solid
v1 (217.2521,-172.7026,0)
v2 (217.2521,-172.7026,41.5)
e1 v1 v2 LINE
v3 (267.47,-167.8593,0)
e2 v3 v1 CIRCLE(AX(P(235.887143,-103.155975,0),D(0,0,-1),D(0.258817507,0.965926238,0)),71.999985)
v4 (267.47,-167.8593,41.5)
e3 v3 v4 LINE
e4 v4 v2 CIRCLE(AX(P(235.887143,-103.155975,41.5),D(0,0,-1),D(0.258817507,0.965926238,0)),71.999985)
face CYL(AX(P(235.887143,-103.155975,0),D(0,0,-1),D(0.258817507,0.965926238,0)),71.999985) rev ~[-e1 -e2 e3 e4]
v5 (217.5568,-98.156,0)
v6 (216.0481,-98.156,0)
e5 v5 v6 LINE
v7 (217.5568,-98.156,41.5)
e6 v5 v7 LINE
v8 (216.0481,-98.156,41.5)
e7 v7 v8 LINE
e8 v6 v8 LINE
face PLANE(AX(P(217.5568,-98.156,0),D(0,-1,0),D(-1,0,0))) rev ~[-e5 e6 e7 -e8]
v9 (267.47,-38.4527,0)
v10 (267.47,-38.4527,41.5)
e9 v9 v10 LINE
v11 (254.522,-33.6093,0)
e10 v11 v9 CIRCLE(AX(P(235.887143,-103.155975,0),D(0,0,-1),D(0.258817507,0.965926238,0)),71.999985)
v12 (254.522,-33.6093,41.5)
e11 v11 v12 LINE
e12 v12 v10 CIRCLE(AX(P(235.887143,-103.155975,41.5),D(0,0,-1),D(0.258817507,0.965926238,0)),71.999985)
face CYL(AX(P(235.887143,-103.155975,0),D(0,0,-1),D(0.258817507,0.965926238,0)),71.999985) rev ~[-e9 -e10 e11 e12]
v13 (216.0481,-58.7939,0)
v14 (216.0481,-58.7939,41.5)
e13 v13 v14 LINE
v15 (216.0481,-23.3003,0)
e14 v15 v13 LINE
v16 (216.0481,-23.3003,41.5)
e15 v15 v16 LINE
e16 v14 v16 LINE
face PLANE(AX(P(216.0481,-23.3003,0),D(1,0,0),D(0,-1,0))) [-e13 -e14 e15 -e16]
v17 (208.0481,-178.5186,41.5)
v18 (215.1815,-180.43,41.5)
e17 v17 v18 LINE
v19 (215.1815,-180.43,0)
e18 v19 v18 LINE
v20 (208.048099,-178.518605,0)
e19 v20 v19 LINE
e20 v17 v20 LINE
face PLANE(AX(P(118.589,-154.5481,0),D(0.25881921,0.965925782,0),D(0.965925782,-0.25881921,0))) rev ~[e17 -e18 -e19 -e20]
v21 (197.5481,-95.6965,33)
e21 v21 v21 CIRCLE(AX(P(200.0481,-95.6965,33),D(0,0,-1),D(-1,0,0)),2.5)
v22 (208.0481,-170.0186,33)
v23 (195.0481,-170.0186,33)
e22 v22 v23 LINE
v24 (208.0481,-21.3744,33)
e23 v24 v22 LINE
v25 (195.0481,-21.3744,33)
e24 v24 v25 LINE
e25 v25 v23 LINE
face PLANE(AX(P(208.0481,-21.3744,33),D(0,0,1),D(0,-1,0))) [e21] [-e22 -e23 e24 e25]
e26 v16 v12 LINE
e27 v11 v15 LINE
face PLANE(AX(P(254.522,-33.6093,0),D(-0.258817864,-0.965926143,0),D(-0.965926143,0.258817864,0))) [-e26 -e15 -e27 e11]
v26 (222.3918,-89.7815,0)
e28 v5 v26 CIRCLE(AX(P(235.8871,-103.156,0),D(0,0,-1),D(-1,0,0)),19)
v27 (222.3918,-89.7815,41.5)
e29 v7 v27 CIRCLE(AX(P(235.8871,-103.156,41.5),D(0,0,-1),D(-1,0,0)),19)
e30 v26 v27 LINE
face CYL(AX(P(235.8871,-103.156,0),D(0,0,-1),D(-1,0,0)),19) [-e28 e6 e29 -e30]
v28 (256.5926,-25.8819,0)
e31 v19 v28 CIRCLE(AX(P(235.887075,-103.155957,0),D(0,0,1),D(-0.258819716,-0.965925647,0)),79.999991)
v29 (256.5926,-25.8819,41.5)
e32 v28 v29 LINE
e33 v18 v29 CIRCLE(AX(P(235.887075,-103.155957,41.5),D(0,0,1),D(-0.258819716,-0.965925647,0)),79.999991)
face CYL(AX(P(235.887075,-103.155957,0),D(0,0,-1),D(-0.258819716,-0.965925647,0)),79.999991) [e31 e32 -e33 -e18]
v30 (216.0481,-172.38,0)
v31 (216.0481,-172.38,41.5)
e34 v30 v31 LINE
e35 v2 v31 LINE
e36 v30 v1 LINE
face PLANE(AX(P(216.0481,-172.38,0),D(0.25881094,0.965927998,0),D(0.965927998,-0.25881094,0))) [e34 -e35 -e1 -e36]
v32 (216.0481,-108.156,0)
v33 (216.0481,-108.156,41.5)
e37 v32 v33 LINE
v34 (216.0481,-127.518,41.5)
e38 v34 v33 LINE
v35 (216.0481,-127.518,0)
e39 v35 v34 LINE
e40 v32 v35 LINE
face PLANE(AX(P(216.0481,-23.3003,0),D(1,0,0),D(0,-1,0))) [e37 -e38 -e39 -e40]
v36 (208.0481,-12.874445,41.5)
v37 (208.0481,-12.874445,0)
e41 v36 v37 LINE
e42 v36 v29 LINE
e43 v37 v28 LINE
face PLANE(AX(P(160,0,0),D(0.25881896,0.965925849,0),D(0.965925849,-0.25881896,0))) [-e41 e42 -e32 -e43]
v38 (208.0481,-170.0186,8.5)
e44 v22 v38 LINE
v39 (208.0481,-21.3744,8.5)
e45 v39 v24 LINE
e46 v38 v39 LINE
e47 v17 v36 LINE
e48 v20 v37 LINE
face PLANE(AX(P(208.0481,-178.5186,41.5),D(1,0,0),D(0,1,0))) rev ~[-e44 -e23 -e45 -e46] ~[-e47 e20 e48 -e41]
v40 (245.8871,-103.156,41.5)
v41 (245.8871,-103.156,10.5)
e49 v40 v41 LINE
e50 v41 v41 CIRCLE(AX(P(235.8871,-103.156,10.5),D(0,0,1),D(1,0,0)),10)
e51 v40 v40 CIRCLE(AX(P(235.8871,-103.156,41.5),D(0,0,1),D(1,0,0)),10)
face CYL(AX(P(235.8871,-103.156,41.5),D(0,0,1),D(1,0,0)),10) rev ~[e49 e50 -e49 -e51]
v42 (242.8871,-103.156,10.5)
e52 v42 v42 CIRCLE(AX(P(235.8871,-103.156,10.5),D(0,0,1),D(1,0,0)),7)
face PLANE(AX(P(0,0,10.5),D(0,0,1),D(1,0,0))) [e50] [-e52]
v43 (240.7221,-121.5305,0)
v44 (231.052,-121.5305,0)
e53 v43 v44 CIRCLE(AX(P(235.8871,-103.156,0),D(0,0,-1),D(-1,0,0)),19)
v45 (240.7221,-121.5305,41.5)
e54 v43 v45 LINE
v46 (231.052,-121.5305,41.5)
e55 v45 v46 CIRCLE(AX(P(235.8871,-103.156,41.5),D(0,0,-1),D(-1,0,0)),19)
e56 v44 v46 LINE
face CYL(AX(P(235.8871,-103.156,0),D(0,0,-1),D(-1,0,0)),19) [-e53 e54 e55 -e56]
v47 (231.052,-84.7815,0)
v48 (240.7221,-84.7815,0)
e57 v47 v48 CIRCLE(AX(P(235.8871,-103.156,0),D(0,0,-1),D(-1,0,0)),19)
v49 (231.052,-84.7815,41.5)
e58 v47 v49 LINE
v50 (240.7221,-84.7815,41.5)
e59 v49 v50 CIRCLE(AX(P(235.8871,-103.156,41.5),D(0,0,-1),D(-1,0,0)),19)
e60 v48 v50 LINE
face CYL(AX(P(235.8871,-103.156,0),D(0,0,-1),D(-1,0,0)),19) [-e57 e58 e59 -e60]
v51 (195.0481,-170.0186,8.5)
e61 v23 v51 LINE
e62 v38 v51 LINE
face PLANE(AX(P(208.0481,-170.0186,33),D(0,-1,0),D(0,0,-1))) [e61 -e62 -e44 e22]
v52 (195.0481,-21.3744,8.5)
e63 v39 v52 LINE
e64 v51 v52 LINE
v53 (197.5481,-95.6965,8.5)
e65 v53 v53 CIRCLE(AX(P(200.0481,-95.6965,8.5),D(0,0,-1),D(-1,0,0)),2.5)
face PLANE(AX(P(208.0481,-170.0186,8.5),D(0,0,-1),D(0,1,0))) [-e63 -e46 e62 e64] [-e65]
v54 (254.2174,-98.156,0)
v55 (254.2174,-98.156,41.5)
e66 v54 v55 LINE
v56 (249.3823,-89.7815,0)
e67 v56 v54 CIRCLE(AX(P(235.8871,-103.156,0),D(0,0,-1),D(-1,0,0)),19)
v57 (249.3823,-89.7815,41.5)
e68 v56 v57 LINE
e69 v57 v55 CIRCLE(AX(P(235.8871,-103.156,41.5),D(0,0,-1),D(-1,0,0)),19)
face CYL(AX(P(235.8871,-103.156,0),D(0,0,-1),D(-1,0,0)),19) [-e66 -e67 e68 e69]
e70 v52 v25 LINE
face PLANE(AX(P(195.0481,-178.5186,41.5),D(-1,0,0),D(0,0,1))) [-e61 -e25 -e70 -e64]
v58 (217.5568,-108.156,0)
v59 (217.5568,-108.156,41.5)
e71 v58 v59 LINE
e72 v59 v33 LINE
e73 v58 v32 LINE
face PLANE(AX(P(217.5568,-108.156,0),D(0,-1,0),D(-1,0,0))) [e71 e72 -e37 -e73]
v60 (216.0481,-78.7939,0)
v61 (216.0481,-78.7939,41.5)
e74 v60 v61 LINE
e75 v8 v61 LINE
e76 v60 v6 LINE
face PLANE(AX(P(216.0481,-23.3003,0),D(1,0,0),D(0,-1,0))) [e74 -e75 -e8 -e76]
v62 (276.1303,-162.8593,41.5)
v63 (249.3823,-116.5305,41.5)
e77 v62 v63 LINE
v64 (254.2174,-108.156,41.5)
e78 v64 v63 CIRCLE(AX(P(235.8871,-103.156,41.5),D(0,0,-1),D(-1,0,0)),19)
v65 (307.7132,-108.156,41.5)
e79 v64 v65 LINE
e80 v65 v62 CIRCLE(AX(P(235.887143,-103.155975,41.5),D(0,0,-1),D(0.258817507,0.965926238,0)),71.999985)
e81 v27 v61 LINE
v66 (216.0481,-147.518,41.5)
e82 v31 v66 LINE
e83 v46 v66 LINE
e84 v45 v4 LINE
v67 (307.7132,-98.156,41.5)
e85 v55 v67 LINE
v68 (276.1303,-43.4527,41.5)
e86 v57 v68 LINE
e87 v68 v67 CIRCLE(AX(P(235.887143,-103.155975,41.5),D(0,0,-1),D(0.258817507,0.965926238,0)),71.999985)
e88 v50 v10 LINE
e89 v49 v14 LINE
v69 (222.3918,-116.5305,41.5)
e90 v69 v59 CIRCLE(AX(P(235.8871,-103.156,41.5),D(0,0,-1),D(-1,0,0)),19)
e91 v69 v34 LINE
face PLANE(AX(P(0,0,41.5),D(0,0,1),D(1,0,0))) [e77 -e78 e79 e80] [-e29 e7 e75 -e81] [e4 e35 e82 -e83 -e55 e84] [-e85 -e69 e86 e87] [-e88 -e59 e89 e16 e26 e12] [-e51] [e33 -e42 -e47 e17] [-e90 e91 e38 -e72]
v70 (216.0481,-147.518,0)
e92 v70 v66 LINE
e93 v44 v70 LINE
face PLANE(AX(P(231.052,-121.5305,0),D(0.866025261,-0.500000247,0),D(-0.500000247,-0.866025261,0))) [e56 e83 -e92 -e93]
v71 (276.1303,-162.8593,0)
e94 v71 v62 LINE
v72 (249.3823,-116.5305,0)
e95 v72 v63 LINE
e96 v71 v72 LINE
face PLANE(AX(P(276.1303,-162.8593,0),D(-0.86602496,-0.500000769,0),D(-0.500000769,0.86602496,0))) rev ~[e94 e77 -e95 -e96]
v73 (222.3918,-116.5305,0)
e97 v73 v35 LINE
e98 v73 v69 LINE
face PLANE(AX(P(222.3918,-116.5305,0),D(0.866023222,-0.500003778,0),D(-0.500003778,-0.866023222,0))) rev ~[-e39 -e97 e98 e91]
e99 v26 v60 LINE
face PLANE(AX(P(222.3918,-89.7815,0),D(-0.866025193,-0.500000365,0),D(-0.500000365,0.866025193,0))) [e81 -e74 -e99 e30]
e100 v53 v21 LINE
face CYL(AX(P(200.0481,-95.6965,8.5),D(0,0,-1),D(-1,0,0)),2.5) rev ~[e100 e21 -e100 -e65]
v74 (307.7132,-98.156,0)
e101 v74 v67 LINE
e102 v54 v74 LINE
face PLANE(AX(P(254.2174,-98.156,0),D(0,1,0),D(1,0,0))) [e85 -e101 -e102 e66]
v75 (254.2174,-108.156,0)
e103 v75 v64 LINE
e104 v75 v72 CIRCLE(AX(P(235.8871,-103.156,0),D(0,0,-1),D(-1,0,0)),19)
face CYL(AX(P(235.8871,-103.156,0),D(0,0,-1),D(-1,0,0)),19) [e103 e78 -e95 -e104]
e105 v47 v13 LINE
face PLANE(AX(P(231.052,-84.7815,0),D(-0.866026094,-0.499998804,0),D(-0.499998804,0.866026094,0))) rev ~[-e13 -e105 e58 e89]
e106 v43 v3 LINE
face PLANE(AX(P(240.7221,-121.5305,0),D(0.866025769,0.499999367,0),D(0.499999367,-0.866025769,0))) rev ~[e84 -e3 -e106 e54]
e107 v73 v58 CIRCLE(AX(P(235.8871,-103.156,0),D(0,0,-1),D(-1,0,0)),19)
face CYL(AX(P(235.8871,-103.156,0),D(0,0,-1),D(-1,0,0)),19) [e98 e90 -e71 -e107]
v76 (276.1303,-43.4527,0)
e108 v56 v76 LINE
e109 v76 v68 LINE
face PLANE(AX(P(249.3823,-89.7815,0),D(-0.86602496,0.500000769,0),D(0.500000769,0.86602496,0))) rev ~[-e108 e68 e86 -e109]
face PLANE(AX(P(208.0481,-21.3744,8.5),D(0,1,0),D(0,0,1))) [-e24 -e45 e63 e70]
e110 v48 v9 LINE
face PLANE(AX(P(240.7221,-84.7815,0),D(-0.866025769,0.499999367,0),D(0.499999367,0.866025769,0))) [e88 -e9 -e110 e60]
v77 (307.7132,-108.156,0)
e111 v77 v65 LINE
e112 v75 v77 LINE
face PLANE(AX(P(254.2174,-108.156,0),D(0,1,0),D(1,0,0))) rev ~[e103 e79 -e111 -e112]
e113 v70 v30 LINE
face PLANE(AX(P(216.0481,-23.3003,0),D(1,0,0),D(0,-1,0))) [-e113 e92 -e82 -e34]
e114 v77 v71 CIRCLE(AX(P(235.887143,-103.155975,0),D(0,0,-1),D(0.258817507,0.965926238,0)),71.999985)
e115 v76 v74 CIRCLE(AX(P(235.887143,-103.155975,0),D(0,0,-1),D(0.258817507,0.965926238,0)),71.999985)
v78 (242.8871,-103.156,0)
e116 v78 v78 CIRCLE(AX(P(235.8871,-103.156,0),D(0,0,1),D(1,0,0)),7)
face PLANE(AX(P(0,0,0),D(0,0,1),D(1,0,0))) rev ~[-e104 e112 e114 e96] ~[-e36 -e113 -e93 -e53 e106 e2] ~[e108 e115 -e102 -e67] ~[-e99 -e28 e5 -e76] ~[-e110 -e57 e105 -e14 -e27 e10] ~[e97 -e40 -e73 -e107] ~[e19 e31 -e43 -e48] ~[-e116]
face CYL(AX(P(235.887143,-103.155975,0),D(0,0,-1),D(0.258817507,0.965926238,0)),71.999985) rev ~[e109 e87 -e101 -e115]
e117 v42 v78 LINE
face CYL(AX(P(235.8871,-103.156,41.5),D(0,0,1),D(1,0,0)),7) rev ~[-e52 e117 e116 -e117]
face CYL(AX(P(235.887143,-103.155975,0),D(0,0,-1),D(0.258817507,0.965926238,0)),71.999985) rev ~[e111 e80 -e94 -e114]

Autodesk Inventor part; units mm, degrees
ref_plane "YZ Plane" through (0, 0, 0) normal (1, 0, 0) x (0, 1, 0)
ref_plane "XZ Plane" through (0, 0, 0) normal (0, 1, 0) x (-1, 0, 0)
ref_plane "XY Plane" through (0, 0, 0) normal (0, 0, 1) x (1, 0, 0)
sketch "Sketch1" plane through (0, 0, 0) normal (0, 0, 1) x (1, 0, 0)
  line L0 (0, 0) -> (160, 0)
  line L1 (160, 0) -> (118.589, -154.5481) construction
  line L2 (0, 0) -> (41.411, -154.5481) construction
  line L3 (41.411, -154.5481) -> (118.589, -154.5481)
  circle A0 centre (235.8871, -103.156) radius 80 construction
  line L4 (160, 0) -> (256.5926, -25.8819)
  line L5 (118.589, -154.5481) -> (215.1815, -180.43)
  arc A1 (215.1815, -180.43) -> (256.5926, -25.8819) centre (235.8871, -103.156) ccw
  circle A2 centre (-75.8871, -103.156) radius 80 construction
  line L6 (0, 0) -> (-96.5926, -25.8819)
  line L7 (41.411, -154.5481) -> (-55.1815, -180.43)
  arc A3 (-96.5926, -25.8819) -> (-55.1815, -180.43) centre (-75.8871, -103.156) ccw
  dimension "d0" = 160
  dimension "d1" = 160
  dimension "d2" = 160
  dimension "d3" = 75
  dimension "d4" = 75
  dimension "d5" = 160
  dimension "d6" = 100
  dimension "d7" = 160
  dimension "d9" = 100
extrude "Extrusion1" add sketch "Sketch1" along normal blind 41.5
sketch "Sketch2" plane through (0, 0, 41.5) normal (0, 0, 1) x (1, 0, 0)
  line L0 (-26.5, -133) -> (186.5, -133)
  line L1 (186.5, -133) -> (186.5, -20)
  line L2 (186.5, -20) -> (-26.5, -20)
  line L3 (-26.5, -20) -> (-26.5, -133)
  line L4 (160, 0) -> (0, 0) projected
  point P0 (80, -20)
  point P1 (80, 0)
  dimension "d12" = 213
  dimension "d13" = 113
  dimension "d14" = 20
extrude "Extrusion2" cut sketch "Sketch2" against normal through all
sketch "Sketch3" plane through (0, 0, 41.5) normal (0, 0, 1) x (1, 0, 0)
  line L0 (-26.5, -133) -> (-26.5, -20) construction
  line L1 (-26.5, -20) -> (186.5, -20) construction
  line L2 (186.5, -20) -> (186.5, -133) construction
  line L3 (186.5, -133) -> (-26.5, -133) construction
  line L4 (-48.0481, 1.5481) -> (-48.0481, -154.5481) construction
  line L5 (-48.0481, -154.5481) -> (208.0481, -154.5481) construction
  line L6 (208.0481, -154.5481) -> (208.0481, 1.5481) construction
  line L7 (208.0481, 1.5481) -> (-48.0481, 1.5481) construction
  line L8 (41.411, -154.5481) -> (118.589, -154.5481) construction
  line L9 (-48.0481, 1.5481) -> (-48.0481, -178.5186) construction
  line L10 (-55.1815, -180.43) -> (41.411, -154.5481) construction
  line L11 (208.0481, 1.5481) -> (208.0481, -178.5186) construction
  line L12 (118.589, -154.5481) -> (215.1815, -180.43) construction
  line L13 (-48.0481, -178.5186) -> (208.0481, -178.5186) construction
  line L14 (-48.0481, 1.5481) -> (208.0481, 1.5481) construction
  line L15 (160, 0) -> (256.5926, -25.8819) construction
  line L16 (208.2963, -12.941) -> (208.0481, -178.5186)
  line L17 (208.2963, -12.941) -> (256.5926, -25.8819)
  line L18 (208.0481, -178.5186) -> (215.1815, -180.43)
  arc A0 (215.1815, -180.43) -> (256.5926, -25.8819) centre (235.8871, -103.156) ccw
  line L19 (208.0481, 1.5481) -> (-166.9519, 1.5481)
  line L20 (-166.9519, 1.5481) -> (-166.9519, -188.4519)
  line L21 (-166.9519, -188.4519) -> (208.0481, -188.4519)
  line L22 (208.0481, -188.4519) -> (208.0481, 1.5481)
  point P0 (0, 0)
  point P1 (80, -154.5481)
  dimension "d17" = 190
  dimension "d18" = 375
extrude "Extrusion3" cut sketch "Sketch3" against normal through all contours L22 L21 L20 L19
sketch "Sketch4" plane through (0, 0, 41.5) normal (0, 0, 1) x (1, 0, 0)
  arc A0 (215.1815, -180.43) -> (256.5926, -25.8819) centre (235.8871, -103.156) ccw projected
  circle A1 centre (235.8871, -103.156) radius 7
  point P0 (0, 0)
  dimension "d21" = 14
extrude "Extrusion4" cut sketch "Sketch4" against normal through all
sketch "Sketch5" plane through (208.0481, -178.5186, 41.5) normal (-1, 0, 0) x (0, 0, 1)
  line L0 (-41.5, 165.6442) -> (0, 165.6442) projected
  line L1 (-41.5, 0) -> (-41.5, 165.6442) projected
  line L2 (0, 0) -> (-41.5, 0) projected
  line L3 (0, 165.6442) -> (0, 0) projected
  line L4 (-33, 157.1442) -> (-8.5, 157.1442)
  line L5 (-8.5, 157.1442) -> (-8.5, 8.5)
  line L6 (-8.5, 8.5) -> (-33, 8.5)
  line L7 (-33, 8.5) -> (-33, 157.1442)
  point P0 (-41.5, 178.5186)
  dimension "d24" = 8.5
extrude "Extrusion5" add sketch "Sketch5" along normal blind 13 contours L4 L5 L6 L7
sketch "Sketch6" plane through (208.0481, -170.0186, 8.5) normal (0, 0, -1) x (-1, 0, 0)
  circle A0 centre (8, 74.3221) radius 2.5
  line L0 (0, -8.5) -> (0, 157.1442) projected
  point P0 (208.0481, 170.0186)
  point P1 (0, 74.3221)
  dimension "d27" = 5
  dimension "d28" = 8
extrude "Extrusion6" cut sketch "Sketch6" against normal through all
sketch "Sketch7" plane through (0, 0, 0) normal (0, 0, -1) x (-1, 0, 0)
  circle A0 centre (-235.8871, -103.156) radius 7 projected
  line L0 (-208.0481, -178.5186) -> (-208.0481, -12.8745) projected
  line L1 (-208.0481, -12.8745) -> (-256.5926, -25.8819) projected
  arc A1 (-256.5926, -25.8819) -> (-215.1815, -180.43) centre (-235.8871, -103.156) ccw projected
  line L2 (-215.1815, -180.43) -> (-208.0481, -178.5186) projected
  line L3 (-254.522, -33.6093) -> (-216.0481, -23.3003)
  line L4 (-216.0481, -23.3003) -> (-216.0481, -172.38)
  line L5 (-216.0481, -172.38) -> (-217.2521, -172.7026)
  arc A2 (-254.522, -33.6093) -> (-217.2521, -172.7026) centre (-235.8871, -103.156) ccw
  circle A3 centre (-235.8871, -103.156) radius 19
  point P0 (0, 0)
  dimension "d31" = 8
  dimension "d32" = 12
extrude "Extrusion7" cut sketch "Sketch7" against normal through all contours L3 L4 L5 A2
sketch "Sketch8" plane through (0, 0, 0) normal (0, 0, -1) x (-1, 0, 0)
  circle A0 centre (-235.8871, -103.156) radius 7 construction
  circle A1 centre (-235.8871, -103.156) radius 19 construction
  line L0 (-235.8871, -103.156) -> (-159.7277, -103.156) construction
  line L1 (-217.5568, -98.156) -> (-123.6167, -98.156) construction
  line L2 (-217.5568, -108.156) -> (-123.6167, -108.156) construction
  line L3 (-231.052, -84.7815) -> (-184.082, -3.427) construction
  line L4 (-222.3918, -89.7815) -> (-175.4217, -8.427) construction
  line L5 (-249.3823, -89.7815) -> (-296.3524, -8.427) construction
  line L6 (-240.7221, -84.7815) -> (-287.6921, -3.427) construction
  line L7 (-254.2174, -108.156) -> (-348.1575, -108.156) construction
  line L8 (-254.2174, -98.156) -> (-348.1575, -98.156) construction
  line L9 (-240.7221, -121.5305) -> (-287.6921, -202.885) construction
  line L10 (-249.3823, -116.5305) -> (-296.3524, -197.885) construction
  line L11 (-222.3918, -116.5305) -> (-175.4217, -197.885) construction
  line L12 (-231.052, -121.5305) -> (-184.082, -202.885) construction
  line L13 (-216.0481, -23.3003) -> (-216.0481, -172.38) construction
  arc A2 (-254.522, -33.6093) -> (-217.2521, -172.7026) centre (-235.8871, -103.156) ccw construction
  line L14 (-254.522, -33.6093) -> (-216.0481, -23.3003) construction
  line L15 (-216.0481, -172.38) -> (-217.2521, -172.7026) construction
  line L16 (-217.5568, -98.156) -> (-216.0481, -98.156)
  line L17 (-217.5568, -108.156) -> (-216.0481, -108.156)
  line L18 (-222.3918, -116.5305) -> (-216.0481, -127.518)
  line L19 (-231.052, -121.5305) -> (-216.0481, -147.518)
  line L20 (-240.7221, -121.5305) -> (-267.47, -167.8593)
  line L21 (-276.1303, -162.8593) -> (-249.3823, -116.5305)
  line L22 (-254.2174, -108.156) -> (-307.7132, -108.156)
  line L23 (-254.2174, -98.156) -> (-307.7132, -98.156)
  line L24 (-249.3823, -89.7815) -> (-276.1303, -43.4527)
  line L25 (-240.7221, -84.7815) -> (-267.47, -38.4527)
  line L26 (-231.052, -84.7815) -> (-216.0481, -58.7939)
  line L27 (-222.3918, -89.7815) -> (-216.0481, -78.7939)
  line L28 (-216.0481, -58.7939) -> (-216.0481, -78.7939)
  line L29 (-216.0481, -98.156) -> (-216.0481, -108.156)
  line L30 (-216.0481, -127.518) -> (-216.0481, -147.518)
  arc A3 (-267.47, -38.4527) -> (-276.1303, -43.4527) centre (-235.8871, -103.156) ccw
  arc A4 (-307.7132, -98.156) -> (-307.7132, -108.156) centre (-235.8871, -103.156) ccw
  arc A5 (-276.1303, -162.8593) -> (-267.47, -167.8593) centre (-235.8871, -103.156) ccw
  arc A6 (-217.5568, -108.156) -> (-217.5568, -98.156) centre (-235.8871, -103.156) ccw
  arc A7 (-231.052, -121.5305) -> (-222.3918, -116.5305) centre (-235.8871, -103.156) ccw
  arc A8 (-249.3823, -116.5305) -> (-240.7221, -121.5305) centre (-235.8871, -103.156) ccw
  arc A9 (-254.2174, -98.156) -> (-254.2174, -108.156) centre (-235.8871, -103.156) ccw
  arc A10 (-240.7221, -84.7815) -> (-249.3823, -89.7815) centre (-235.8871, -103.156) ccw
  arc A11 (-222.3918, -89.7815) -> (-231.052, -84.7815) centre (-235.8871, -103.156) ccw
  point P0 (0, 0)
  dimension "d36" = 5
  dimension "d37" = 5
  dimension "d40" = 360
extrude "Extrusion8" add sketch "Sketch8" against normal blind 41.5
sketch "Sketch9" plane through (0, 0, 41.5) normal (0, 0, 1) x (1, 0, 0)
  circle A0 centre (235.8871, -103.156) radius 7 projected
  circle A1 centre (235.8871, -103.156) radius 10
  point P0 (0, 0)
  dimension "d46" = 20
extrude "Extrusion9" cut sketch "Sketch9" against normal blind 31
properties part number "Riser Base" material "ABS Plastic"
